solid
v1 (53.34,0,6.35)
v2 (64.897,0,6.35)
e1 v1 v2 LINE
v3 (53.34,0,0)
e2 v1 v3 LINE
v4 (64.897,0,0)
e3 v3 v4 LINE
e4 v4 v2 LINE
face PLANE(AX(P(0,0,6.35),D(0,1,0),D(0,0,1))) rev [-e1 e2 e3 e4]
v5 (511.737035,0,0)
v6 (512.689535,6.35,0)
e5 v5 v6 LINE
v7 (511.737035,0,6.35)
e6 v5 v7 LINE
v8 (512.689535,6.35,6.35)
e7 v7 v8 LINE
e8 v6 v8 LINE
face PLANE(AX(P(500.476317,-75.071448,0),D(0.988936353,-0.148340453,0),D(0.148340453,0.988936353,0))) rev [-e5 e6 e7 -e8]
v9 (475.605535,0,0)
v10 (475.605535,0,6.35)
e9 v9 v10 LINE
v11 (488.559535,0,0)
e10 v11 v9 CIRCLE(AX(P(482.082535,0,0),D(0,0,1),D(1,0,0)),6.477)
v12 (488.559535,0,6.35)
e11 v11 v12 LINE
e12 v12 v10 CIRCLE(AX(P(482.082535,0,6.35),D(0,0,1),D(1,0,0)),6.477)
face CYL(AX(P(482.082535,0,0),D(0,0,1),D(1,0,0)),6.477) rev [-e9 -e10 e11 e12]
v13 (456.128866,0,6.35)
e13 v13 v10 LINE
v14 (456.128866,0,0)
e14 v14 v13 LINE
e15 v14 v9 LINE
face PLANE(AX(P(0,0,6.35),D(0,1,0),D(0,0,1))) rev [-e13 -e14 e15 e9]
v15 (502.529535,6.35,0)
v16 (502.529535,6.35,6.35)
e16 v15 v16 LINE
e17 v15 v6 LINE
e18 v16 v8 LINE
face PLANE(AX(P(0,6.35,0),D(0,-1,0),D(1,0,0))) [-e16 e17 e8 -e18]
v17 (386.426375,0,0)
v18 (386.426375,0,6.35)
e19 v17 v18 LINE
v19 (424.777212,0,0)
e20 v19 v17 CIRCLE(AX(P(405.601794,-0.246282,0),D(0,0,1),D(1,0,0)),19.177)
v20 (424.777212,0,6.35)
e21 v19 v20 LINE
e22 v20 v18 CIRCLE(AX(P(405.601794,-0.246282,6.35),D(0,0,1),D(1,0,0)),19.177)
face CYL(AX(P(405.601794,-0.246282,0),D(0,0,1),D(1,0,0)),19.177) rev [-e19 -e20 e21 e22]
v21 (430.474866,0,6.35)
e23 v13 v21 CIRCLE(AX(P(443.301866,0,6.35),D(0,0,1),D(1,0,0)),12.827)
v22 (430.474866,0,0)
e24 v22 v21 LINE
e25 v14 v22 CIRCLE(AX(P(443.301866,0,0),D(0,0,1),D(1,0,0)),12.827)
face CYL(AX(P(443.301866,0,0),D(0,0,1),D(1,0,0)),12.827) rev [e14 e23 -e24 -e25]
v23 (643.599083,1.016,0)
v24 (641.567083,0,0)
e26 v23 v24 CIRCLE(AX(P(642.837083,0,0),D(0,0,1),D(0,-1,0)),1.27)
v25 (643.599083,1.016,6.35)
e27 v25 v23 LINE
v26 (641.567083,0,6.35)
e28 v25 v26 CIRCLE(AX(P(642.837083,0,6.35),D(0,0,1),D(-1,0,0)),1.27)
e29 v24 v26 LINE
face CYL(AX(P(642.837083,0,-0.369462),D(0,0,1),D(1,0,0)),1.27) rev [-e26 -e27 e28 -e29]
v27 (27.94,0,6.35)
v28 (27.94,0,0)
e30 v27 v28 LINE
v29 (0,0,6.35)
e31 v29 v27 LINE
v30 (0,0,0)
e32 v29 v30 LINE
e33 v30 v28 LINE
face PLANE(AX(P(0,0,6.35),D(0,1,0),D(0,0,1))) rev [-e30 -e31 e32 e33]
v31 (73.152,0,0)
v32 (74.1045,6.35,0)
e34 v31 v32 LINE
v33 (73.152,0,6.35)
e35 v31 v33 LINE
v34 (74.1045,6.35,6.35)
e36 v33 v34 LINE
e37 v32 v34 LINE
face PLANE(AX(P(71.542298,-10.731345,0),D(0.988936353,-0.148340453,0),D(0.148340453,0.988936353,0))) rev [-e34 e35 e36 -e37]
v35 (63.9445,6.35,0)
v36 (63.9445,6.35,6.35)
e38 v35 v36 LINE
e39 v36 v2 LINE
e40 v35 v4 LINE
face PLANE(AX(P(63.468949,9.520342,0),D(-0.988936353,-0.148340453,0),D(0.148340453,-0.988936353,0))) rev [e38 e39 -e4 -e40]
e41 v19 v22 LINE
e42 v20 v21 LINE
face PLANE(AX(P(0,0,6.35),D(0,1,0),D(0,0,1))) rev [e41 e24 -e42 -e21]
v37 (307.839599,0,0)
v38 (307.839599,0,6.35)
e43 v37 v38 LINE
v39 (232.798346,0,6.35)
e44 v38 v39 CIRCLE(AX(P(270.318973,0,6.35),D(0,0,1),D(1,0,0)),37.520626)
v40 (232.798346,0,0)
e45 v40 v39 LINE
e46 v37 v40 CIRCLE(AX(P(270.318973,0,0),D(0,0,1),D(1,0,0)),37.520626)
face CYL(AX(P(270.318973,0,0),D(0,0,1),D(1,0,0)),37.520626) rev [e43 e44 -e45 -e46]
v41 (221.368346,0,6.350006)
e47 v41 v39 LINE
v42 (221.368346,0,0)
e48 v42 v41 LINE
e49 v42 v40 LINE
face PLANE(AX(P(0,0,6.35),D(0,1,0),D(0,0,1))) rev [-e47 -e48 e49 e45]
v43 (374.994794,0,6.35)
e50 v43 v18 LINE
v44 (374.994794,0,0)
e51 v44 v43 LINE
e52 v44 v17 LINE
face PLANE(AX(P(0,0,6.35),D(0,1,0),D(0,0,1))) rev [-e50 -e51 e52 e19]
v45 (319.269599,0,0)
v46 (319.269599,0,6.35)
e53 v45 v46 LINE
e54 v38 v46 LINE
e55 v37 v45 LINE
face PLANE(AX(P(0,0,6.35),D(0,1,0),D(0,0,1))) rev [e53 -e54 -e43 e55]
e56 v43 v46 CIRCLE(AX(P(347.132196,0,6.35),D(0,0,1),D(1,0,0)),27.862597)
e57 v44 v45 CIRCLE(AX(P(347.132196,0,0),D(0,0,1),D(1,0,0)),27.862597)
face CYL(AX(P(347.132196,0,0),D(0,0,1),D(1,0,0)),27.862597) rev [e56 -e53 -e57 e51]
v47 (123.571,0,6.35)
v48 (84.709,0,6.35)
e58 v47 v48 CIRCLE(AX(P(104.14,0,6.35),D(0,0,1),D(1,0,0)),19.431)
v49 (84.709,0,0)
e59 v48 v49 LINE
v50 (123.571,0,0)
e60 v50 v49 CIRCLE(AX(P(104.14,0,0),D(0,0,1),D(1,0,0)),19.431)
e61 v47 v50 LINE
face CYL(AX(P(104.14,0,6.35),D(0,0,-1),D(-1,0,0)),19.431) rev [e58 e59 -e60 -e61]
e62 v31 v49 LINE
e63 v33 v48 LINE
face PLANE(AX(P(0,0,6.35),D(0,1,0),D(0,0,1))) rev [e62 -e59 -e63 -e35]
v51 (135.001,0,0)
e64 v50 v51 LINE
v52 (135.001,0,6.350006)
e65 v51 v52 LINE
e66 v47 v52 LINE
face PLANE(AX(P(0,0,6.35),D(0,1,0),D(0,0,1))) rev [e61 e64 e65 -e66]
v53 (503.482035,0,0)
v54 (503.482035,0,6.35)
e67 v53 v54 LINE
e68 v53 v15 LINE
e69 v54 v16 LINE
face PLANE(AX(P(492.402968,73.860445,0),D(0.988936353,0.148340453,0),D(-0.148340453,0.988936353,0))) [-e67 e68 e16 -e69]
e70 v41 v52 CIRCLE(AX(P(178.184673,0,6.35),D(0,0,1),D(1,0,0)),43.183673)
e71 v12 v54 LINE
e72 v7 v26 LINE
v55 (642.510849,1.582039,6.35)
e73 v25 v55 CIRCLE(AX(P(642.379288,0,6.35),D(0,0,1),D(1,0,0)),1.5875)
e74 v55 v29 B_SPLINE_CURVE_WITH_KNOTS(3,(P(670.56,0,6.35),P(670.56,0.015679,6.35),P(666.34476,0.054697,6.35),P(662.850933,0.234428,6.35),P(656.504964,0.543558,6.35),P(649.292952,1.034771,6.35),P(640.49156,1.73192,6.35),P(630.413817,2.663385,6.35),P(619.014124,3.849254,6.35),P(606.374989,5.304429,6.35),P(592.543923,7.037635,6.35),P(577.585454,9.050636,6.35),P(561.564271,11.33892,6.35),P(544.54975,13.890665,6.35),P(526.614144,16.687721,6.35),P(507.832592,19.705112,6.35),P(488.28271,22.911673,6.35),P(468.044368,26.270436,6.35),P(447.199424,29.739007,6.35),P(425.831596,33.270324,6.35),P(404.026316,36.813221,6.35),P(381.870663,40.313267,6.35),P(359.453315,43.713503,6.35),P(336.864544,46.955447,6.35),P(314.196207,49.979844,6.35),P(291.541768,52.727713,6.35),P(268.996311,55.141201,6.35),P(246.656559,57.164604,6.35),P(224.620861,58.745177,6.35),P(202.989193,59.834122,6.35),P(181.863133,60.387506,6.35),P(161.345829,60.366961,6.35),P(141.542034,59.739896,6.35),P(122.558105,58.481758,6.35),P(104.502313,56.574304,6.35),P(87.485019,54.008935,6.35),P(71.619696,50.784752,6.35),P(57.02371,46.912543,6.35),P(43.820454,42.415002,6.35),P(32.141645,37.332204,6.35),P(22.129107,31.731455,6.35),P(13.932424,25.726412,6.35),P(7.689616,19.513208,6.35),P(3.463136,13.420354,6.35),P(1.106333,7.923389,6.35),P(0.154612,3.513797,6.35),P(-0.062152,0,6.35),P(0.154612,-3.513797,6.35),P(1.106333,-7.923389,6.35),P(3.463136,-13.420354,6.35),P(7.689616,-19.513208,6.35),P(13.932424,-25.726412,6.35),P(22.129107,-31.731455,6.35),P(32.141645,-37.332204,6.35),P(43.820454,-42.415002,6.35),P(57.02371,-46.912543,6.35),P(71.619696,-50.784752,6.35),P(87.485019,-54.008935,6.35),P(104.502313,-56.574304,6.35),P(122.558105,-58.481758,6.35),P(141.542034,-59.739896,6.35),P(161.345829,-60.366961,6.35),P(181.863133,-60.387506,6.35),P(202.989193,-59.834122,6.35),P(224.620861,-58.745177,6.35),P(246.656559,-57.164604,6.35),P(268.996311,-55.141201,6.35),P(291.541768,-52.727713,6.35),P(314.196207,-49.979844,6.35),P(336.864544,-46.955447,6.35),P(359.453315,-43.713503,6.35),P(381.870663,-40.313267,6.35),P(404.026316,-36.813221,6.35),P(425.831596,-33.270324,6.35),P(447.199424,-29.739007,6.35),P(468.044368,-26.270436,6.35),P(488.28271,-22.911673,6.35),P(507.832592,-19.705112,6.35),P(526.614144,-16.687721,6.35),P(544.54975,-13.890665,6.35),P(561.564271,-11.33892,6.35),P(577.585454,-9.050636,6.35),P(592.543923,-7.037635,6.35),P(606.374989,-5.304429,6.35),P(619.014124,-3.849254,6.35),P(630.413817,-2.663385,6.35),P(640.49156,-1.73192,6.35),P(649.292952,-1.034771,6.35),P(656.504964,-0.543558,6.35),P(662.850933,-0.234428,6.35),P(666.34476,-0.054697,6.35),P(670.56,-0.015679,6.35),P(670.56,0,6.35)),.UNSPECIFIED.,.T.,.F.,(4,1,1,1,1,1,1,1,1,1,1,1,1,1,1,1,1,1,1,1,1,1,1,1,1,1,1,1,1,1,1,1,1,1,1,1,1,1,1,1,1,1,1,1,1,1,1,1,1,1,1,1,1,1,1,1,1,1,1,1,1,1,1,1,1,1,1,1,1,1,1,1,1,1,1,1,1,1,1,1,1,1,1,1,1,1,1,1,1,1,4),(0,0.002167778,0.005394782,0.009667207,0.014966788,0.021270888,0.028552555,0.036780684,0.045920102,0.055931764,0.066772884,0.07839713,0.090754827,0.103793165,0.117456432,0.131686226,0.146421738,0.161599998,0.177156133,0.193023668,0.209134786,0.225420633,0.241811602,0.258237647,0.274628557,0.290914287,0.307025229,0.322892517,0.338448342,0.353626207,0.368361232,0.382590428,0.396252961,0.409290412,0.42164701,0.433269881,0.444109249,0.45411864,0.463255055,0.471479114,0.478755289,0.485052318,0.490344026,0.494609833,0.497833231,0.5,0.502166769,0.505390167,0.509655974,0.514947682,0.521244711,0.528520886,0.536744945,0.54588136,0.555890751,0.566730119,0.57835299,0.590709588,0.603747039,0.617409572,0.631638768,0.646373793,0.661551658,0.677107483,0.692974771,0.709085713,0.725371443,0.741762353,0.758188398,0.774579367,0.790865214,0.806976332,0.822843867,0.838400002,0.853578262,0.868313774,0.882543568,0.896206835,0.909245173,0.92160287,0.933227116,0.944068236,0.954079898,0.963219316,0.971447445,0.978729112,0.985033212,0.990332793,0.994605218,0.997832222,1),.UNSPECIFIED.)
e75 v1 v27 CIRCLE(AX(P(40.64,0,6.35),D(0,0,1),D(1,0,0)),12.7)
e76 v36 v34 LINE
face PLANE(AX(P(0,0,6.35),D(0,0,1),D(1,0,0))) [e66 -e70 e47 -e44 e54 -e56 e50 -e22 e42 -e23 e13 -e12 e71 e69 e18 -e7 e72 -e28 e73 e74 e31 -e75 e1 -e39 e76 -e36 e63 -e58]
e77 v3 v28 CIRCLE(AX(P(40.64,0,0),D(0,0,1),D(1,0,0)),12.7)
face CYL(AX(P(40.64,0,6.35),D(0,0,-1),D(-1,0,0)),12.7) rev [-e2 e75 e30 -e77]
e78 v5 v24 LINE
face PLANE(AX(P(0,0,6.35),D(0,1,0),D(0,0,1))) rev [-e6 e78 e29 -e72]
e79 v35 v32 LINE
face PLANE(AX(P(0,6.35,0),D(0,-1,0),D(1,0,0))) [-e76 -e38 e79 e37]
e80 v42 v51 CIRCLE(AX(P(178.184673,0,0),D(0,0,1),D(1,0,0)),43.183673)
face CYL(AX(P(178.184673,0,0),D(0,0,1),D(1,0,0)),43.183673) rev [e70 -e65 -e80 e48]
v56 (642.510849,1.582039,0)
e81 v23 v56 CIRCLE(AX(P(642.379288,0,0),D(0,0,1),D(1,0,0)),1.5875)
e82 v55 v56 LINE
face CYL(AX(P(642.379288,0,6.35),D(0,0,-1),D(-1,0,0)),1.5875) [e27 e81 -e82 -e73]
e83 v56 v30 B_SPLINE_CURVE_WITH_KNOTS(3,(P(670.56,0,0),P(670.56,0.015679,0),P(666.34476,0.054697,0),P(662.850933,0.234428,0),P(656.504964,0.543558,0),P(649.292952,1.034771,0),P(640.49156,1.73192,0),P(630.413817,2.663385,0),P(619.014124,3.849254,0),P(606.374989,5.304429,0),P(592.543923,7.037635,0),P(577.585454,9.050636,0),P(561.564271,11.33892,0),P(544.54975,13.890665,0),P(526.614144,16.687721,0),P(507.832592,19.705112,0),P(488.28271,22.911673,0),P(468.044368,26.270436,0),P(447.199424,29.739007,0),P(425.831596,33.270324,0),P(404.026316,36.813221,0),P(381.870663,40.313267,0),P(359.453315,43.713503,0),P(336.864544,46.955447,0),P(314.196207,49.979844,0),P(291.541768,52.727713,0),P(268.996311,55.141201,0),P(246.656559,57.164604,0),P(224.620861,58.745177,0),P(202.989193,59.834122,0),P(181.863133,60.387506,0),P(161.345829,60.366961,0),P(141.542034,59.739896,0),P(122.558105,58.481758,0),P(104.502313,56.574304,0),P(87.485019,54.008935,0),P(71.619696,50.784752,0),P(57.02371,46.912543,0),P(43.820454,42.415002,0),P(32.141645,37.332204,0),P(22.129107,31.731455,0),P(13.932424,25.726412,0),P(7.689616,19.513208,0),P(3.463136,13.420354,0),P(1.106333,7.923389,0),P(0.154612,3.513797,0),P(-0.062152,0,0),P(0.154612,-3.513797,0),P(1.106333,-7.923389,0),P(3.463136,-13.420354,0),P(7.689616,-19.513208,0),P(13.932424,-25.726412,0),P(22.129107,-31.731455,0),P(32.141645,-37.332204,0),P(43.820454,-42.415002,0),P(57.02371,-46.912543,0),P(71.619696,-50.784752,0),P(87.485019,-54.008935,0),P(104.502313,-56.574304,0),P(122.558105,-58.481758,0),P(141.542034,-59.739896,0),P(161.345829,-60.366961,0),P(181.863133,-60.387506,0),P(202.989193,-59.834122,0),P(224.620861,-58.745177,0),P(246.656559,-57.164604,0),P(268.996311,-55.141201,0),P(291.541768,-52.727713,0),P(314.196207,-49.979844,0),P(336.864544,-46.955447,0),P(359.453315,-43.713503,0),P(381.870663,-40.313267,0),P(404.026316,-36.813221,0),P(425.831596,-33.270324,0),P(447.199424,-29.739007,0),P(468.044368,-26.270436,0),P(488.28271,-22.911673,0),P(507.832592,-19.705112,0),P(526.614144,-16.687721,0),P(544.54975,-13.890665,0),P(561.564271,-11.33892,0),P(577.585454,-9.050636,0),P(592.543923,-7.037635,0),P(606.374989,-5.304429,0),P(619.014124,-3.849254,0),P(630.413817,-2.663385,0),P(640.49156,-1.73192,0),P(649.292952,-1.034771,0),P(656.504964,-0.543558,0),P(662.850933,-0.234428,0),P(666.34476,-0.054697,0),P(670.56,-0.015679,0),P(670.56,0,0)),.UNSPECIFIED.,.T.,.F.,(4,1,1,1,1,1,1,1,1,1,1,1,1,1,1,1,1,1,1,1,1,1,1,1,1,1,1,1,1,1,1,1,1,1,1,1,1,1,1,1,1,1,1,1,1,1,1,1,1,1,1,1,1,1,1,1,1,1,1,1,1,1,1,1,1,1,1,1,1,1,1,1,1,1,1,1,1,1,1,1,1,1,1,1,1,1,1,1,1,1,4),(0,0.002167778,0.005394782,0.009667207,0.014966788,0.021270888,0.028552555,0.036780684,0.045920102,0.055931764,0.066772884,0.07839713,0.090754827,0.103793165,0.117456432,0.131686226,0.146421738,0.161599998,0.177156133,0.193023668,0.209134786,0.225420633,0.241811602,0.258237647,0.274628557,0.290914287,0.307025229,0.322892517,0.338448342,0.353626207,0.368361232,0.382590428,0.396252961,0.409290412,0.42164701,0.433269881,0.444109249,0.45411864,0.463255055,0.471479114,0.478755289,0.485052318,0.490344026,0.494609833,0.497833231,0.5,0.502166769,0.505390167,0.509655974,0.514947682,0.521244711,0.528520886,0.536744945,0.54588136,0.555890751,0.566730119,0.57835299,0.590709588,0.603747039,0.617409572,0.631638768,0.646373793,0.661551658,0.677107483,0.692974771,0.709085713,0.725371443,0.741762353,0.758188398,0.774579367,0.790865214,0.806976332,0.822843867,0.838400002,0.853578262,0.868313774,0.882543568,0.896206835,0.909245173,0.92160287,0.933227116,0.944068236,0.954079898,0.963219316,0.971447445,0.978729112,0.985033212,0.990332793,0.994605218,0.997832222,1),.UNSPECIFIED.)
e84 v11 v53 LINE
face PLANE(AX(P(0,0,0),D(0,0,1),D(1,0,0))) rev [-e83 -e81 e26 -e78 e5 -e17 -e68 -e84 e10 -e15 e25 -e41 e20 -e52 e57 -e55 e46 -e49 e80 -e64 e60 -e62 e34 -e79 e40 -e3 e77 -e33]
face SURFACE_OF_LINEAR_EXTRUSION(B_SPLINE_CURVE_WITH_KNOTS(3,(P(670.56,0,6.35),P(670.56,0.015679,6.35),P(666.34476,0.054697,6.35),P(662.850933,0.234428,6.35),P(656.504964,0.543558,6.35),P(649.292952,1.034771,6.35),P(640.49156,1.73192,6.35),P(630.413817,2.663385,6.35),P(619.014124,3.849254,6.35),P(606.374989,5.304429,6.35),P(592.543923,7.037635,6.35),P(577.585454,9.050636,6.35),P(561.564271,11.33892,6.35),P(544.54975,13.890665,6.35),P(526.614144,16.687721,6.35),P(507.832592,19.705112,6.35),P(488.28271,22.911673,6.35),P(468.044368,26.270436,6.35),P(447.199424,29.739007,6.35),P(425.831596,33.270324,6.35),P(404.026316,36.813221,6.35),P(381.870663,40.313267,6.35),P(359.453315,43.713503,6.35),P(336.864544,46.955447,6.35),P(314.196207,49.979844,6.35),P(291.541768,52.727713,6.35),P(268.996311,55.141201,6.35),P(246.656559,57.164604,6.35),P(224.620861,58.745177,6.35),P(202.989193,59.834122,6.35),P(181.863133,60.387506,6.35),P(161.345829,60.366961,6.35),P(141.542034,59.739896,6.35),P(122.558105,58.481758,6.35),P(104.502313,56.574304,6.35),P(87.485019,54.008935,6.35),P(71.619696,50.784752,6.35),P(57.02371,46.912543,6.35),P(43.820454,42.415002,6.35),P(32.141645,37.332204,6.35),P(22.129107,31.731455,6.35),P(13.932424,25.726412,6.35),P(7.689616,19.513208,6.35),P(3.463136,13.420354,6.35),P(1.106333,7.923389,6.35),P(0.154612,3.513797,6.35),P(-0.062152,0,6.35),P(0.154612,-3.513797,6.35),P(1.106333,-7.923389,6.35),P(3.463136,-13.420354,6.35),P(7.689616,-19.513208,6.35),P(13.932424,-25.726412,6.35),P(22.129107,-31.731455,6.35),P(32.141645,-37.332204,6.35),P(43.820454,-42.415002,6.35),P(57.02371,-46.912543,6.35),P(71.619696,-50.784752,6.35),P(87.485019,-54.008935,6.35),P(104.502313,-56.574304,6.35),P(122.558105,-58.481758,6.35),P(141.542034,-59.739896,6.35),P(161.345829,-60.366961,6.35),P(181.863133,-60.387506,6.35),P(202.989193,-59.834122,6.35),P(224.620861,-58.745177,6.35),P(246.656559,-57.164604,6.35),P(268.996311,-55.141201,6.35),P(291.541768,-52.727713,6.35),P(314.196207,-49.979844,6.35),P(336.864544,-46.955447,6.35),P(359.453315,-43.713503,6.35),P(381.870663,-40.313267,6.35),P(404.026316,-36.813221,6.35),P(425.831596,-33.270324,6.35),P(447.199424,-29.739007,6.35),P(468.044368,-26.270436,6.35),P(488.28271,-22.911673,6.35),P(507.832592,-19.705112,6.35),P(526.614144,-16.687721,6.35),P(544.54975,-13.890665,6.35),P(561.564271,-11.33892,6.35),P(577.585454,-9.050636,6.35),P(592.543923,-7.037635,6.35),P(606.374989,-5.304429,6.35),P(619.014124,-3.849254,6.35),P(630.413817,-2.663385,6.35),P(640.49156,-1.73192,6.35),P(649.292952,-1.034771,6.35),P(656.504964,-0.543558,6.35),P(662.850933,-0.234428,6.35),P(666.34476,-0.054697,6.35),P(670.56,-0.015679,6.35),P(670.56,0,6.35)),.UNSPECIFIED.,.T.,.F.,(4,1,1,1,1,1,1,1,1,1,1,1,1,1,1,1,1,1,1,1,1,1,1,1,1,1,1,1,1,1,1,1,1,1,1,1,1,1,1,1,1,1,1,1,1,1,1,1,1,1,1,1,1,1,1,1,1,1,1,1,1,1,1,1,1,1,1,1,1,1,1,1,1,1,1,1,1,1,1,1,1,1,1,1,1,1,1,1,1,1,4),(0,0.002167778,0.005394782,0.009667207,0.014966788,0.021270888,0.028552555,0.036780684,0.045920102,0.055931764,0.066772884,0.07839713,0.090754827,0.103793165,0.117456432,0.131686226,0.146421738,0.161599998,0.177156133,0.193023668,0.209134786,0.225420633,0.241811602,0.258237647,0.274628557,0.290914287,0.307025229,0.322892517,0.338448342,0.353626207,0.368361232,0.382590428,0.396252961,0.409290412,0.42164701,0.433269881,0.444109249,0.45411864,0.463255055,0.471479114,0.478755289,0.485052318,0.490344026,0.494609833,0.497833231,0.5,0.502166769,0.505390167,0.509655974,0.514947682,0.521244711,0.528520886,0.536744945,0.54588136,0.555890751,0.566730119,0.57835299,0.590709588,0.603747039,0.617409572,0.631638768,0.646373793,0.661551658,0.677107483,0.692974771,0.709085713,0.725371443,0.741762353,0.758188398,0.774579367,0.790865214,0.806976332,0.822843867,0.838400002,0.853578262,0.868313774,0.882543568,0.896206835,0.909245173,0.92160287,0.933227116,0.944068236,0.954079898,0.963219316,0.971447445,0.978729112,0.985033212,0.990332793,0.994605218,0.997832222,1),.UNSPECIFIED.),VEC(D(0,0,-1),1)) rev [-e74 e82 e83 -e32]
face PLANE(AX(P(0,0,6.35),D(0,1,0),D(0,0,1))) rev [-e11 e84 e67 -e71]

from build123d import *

# Parameters (mm, degrees)
BOSS_EXTRUDE1_DEPTH     = 6.35
CUT_EXTRUDE1_DEPTH      = 647.819942004
CUT_EXTRUDE1_DEPTH_BACK = 647.819942004
SKETCH4_W               = 6.35
SKETCH4_H               = 6.35
CUT_EXTRUDE2_DEPTH      = 6.35
CUT_EXTRUDE3_START      = -6.35
CUT_EXTRUDE3_DEPTH      = 6.35


# Read off the part's stored shape, not the designer's step: Cut-Extrude3
with BuildPart() as part:
    # Sketch2 → Boss-Extrude1 (new body)
    with BuildSketch(Plane.XY):
        with BuildLine():
            ThreePointArc((84.709, 0), (104.14, 19.431), (123.571, 0))
            Line((123.571, 0), (460.660965279, 0))
            Line((460.660965279, 0), (473.360965279, 0))
            Line((473.360965279, 0), (643.966787522, 0))
            ThreePointArc((643.966787522, 0), (643.547407924, 1.075012082), (642.510849283, 1.582039112))
            add(Edge.make_bspline(
                [(642.510849283, 1.582039112), (641.993392355, 1.625070631), (638.093728429, 1.953546407), (630.413817462, 2.663385493), (619.014124193, 3.849253664), (606.374988512, 5.304428983), (592.543922516, 7.037634907), (577.585454095, 9.050636147), (561.564270734, 11.338919625), (544.549749946, 13.890665375), (526.614143658, 16.687720753), (507.832591566, 19.705111663), (488.282710288, 22.911672601), (468.044367735, 26.27043606), (447.199424328, 29.739007432), (425.831595832, 33.270324121), (404.02631566, 36.813220545), (381.870662856, 40.313266856), (359.453314895, 43.713502532), (336.86454415, 46.955447457), (314.196207315, 49.979843895), (291.541767704, 52.727712704), (268.996310773, 55.141201012), (246.65655865, 57.164603829), (224.620860897, 58.745176641), (202.989192599, 59.8341217), (181.863132616, 60.387506142), (161.345829027, 60.366961324), (141.542033828, 59.739895824), (122.558104573, 58.481758104), (104.502313427, 56.574303932), (87.485018636, 54.008935199), (71.619696083, 50.784752003), (57.023709725, 46.912543066), (43.82045433, 42.41500246), (32.141645239, 37.332204029), (22.129107375, 31.731455339), (13.932423524, 25.726412106), (7.689616489, 19.513207632), (3.463136343, 13.420354421), (1.106333228, 7.923389435), (0.154611582, 3.513796615), (0, 1.007496172), (0, 0)],
                knots=[0.020157042, 0.020157042, 0.020157042, 0.020157042, 0.021270888, 0.028552555, 0.036780684, 0.045920102, 0.055931764, 0.066772884, 0.07839713, 0.090754827, 0.103793165, 0.117456432, 0.131686226, 0.146421738, 0.161599998, 0.177156133, 0.193023668, 0.209134786, 0.225420633, 0.241811602, 0.258237647, 0.274628557, 0.290914287, 0.307025229, 0.322892517, 0.338448342, 0.353626207, 0.368361232, 0.382590428, 0.396252961, 0.409290412, 0.42164701, 0.433269881, 0.444109249, 0.45411864, 0.463255055, 0.471479114, 0.478755289, 0.485052318, 0.490344026, 0.494609833, 0.497833231, 0.5, 0.5, 0.5, 0.5], degree=3))
            Line((0, 0), (27.94, 0))
            ThreePointArc((27.94, 0), (40.64, 12.7), (53.34, 0))
            Line((53.34, 0), (84.709, 0))
        make_face()
    extrude(amount=BOSS_EXTRUDE1_DEPTH)

    # Sketch3 → Cut-Extrude1 (cut, two sides: drawn at the far end of the back side and taken through both)
    with BuildSketch(Plane.XY.offset(6.35).offset(-CUT_EXTRUDE1_DEPTH_BACK)):
        with BuildLine():
            Line((135.001, 0), (221.368346157, 0))
            ThreePointArc((221.368346157, 0), (178.184673078, 43.183673078), (135.001, 0))
        make_face()
        with BuildLine():
            ThreePointArc((135.001, 0), (178.184673078, -43.183673078), (221.368346157, 0))
            Line((221.368346157, 0), (135.001, 0))
        make_face()
        with BuildLine():
            ThreePointArc((307.839599131, 0), (270.318972644, 37.520626487), (232.798346157, 0))
            Line((232.798346157, 0), (307.839599131, 0))
        make_face()
        with BuildLine():
            Line((307.839599131, 0), (232.798346157, 0))
            ThreePointArc((232.798346157, 0), (270.318972644, -37.520626487), (307.839599131, 0))
        make_face()
        with BuildLine():
            ThreePointArc((374.99479385, 0), (347.13219649, 27.862597359), (319.269599131, 0))
            Line((319.269599131, 0), (374.99479385, 0))
        make_face()
        with BuildLine():
            Line((374.99479385, 0), (319.269599131, 0))
            ThreePointArc((319.269599131, 0), (347.13219649, -27.862597359), (374.99479385, 0))
        make_face()
        with BuildLine():
            ThreePointArc((424.777212339, 0), (405.60179385, 18.930718125), (386.426375361, 0))
            Line((386.426375361, 0), (424.777212339, 0))
        make_face()
        with BuildLine():
            Line((424.777212339, 0), (386.426375361, 0))
            ThreePointArc((386.426375361, 0), (405.478650373, -19.422886493), (424.77879385, -0.246281875))
            ThreePointArc((424.77879385, -0.246281875), (424.778398468, -0.123138399), (424.777212339, 0))
        make_face()
        with BuildLine():
            ThreePointArc((456.128866123, 0), (443.301866123, 12.827), (430.474866123, 0))
            Line((430.474866123, 0), (456.128866123, 0))
        make_face()
        with BuildLine():
            Line((456.128866123, 0), (430.474866123, 0))
            ThreePointArc((430.474866123, 0), (443.301866123, -12.827), (456.128866123, 0))
        make_face()
        with BuildLine():
            ThreePointArc((488.559534569, 0), (482.082534569, 6.477), (475.605534569, 0))
            Line((475.605534569, 0), (488.559534569, 0))
        make_face()
        with BuildLine():
            Line((488.559534569, 0), (475.605534569, 0))
            ThreePointArc((475.605534569, 0), (482.082534569, -6.477), (488.559534569, 0))
        make_face()
    extrude(amount=CUT_EXTRUDE1_DEPTH + CUT_EXTRUDE1_DEPTH_BACK, mode=Mode.SUBTRACT)

    # Sketch4 → Cut-Extrude2 (cut)
    with BuildSketch(Plane.XY.offset(6.35)):
        Polygon((504.434534569, 0), (504.434534569, 6.35), (502.529534569, 6.35), (503.482034569, 0), align=None)
        with Locations((507.609534569, 3.175)):
            Rectangle(SKETCH4_W, SKETCH4_H)
        Polygon((512.689534569, 6.35), (510.784534569, 6.35), (510.784534569, 0), (511.737034569, 0), align=None)
        Polygon((63.9445, 6.35), (64.897, 0), (65.8495, 0), (65.8495, 6.35), align=None)
        with Locations((69.0245, 3.175)):
            Rectangle(SKETCH4_W, SKETCH4_H)
        Polygon((72.1995, 6.35), (72.1995, 0), (73.152, 0), (74.1045, 6.35), align=None)
    extrude(amount=-CUT_EXTRUDE2_DEPTH, mode=Mode.SUBTRACT)

    # Cut-Extrude3 outline → Cut-Extrude3 (cut)
    with BuildSketch(Plane.XY.offset(6.35).offset(CUT_EXTRUDE3_START)):
        with BuildLine():
            ThreePointArc((643.966787522, 0), (643.872033495, 0.540245973), (643.599082689, 1.016))
            ThreePointArc((643.599082689, 1.016), (642.269121423, 1.135922533), (641.567082689, 0))
            Line((641.567082689, 0), (643.966787522, 0))
        make_face()
    extrude(amount=CUT_EXTRUDE3_DEPTH, mode=Mode.SUBTRACT)


solid = part.part
